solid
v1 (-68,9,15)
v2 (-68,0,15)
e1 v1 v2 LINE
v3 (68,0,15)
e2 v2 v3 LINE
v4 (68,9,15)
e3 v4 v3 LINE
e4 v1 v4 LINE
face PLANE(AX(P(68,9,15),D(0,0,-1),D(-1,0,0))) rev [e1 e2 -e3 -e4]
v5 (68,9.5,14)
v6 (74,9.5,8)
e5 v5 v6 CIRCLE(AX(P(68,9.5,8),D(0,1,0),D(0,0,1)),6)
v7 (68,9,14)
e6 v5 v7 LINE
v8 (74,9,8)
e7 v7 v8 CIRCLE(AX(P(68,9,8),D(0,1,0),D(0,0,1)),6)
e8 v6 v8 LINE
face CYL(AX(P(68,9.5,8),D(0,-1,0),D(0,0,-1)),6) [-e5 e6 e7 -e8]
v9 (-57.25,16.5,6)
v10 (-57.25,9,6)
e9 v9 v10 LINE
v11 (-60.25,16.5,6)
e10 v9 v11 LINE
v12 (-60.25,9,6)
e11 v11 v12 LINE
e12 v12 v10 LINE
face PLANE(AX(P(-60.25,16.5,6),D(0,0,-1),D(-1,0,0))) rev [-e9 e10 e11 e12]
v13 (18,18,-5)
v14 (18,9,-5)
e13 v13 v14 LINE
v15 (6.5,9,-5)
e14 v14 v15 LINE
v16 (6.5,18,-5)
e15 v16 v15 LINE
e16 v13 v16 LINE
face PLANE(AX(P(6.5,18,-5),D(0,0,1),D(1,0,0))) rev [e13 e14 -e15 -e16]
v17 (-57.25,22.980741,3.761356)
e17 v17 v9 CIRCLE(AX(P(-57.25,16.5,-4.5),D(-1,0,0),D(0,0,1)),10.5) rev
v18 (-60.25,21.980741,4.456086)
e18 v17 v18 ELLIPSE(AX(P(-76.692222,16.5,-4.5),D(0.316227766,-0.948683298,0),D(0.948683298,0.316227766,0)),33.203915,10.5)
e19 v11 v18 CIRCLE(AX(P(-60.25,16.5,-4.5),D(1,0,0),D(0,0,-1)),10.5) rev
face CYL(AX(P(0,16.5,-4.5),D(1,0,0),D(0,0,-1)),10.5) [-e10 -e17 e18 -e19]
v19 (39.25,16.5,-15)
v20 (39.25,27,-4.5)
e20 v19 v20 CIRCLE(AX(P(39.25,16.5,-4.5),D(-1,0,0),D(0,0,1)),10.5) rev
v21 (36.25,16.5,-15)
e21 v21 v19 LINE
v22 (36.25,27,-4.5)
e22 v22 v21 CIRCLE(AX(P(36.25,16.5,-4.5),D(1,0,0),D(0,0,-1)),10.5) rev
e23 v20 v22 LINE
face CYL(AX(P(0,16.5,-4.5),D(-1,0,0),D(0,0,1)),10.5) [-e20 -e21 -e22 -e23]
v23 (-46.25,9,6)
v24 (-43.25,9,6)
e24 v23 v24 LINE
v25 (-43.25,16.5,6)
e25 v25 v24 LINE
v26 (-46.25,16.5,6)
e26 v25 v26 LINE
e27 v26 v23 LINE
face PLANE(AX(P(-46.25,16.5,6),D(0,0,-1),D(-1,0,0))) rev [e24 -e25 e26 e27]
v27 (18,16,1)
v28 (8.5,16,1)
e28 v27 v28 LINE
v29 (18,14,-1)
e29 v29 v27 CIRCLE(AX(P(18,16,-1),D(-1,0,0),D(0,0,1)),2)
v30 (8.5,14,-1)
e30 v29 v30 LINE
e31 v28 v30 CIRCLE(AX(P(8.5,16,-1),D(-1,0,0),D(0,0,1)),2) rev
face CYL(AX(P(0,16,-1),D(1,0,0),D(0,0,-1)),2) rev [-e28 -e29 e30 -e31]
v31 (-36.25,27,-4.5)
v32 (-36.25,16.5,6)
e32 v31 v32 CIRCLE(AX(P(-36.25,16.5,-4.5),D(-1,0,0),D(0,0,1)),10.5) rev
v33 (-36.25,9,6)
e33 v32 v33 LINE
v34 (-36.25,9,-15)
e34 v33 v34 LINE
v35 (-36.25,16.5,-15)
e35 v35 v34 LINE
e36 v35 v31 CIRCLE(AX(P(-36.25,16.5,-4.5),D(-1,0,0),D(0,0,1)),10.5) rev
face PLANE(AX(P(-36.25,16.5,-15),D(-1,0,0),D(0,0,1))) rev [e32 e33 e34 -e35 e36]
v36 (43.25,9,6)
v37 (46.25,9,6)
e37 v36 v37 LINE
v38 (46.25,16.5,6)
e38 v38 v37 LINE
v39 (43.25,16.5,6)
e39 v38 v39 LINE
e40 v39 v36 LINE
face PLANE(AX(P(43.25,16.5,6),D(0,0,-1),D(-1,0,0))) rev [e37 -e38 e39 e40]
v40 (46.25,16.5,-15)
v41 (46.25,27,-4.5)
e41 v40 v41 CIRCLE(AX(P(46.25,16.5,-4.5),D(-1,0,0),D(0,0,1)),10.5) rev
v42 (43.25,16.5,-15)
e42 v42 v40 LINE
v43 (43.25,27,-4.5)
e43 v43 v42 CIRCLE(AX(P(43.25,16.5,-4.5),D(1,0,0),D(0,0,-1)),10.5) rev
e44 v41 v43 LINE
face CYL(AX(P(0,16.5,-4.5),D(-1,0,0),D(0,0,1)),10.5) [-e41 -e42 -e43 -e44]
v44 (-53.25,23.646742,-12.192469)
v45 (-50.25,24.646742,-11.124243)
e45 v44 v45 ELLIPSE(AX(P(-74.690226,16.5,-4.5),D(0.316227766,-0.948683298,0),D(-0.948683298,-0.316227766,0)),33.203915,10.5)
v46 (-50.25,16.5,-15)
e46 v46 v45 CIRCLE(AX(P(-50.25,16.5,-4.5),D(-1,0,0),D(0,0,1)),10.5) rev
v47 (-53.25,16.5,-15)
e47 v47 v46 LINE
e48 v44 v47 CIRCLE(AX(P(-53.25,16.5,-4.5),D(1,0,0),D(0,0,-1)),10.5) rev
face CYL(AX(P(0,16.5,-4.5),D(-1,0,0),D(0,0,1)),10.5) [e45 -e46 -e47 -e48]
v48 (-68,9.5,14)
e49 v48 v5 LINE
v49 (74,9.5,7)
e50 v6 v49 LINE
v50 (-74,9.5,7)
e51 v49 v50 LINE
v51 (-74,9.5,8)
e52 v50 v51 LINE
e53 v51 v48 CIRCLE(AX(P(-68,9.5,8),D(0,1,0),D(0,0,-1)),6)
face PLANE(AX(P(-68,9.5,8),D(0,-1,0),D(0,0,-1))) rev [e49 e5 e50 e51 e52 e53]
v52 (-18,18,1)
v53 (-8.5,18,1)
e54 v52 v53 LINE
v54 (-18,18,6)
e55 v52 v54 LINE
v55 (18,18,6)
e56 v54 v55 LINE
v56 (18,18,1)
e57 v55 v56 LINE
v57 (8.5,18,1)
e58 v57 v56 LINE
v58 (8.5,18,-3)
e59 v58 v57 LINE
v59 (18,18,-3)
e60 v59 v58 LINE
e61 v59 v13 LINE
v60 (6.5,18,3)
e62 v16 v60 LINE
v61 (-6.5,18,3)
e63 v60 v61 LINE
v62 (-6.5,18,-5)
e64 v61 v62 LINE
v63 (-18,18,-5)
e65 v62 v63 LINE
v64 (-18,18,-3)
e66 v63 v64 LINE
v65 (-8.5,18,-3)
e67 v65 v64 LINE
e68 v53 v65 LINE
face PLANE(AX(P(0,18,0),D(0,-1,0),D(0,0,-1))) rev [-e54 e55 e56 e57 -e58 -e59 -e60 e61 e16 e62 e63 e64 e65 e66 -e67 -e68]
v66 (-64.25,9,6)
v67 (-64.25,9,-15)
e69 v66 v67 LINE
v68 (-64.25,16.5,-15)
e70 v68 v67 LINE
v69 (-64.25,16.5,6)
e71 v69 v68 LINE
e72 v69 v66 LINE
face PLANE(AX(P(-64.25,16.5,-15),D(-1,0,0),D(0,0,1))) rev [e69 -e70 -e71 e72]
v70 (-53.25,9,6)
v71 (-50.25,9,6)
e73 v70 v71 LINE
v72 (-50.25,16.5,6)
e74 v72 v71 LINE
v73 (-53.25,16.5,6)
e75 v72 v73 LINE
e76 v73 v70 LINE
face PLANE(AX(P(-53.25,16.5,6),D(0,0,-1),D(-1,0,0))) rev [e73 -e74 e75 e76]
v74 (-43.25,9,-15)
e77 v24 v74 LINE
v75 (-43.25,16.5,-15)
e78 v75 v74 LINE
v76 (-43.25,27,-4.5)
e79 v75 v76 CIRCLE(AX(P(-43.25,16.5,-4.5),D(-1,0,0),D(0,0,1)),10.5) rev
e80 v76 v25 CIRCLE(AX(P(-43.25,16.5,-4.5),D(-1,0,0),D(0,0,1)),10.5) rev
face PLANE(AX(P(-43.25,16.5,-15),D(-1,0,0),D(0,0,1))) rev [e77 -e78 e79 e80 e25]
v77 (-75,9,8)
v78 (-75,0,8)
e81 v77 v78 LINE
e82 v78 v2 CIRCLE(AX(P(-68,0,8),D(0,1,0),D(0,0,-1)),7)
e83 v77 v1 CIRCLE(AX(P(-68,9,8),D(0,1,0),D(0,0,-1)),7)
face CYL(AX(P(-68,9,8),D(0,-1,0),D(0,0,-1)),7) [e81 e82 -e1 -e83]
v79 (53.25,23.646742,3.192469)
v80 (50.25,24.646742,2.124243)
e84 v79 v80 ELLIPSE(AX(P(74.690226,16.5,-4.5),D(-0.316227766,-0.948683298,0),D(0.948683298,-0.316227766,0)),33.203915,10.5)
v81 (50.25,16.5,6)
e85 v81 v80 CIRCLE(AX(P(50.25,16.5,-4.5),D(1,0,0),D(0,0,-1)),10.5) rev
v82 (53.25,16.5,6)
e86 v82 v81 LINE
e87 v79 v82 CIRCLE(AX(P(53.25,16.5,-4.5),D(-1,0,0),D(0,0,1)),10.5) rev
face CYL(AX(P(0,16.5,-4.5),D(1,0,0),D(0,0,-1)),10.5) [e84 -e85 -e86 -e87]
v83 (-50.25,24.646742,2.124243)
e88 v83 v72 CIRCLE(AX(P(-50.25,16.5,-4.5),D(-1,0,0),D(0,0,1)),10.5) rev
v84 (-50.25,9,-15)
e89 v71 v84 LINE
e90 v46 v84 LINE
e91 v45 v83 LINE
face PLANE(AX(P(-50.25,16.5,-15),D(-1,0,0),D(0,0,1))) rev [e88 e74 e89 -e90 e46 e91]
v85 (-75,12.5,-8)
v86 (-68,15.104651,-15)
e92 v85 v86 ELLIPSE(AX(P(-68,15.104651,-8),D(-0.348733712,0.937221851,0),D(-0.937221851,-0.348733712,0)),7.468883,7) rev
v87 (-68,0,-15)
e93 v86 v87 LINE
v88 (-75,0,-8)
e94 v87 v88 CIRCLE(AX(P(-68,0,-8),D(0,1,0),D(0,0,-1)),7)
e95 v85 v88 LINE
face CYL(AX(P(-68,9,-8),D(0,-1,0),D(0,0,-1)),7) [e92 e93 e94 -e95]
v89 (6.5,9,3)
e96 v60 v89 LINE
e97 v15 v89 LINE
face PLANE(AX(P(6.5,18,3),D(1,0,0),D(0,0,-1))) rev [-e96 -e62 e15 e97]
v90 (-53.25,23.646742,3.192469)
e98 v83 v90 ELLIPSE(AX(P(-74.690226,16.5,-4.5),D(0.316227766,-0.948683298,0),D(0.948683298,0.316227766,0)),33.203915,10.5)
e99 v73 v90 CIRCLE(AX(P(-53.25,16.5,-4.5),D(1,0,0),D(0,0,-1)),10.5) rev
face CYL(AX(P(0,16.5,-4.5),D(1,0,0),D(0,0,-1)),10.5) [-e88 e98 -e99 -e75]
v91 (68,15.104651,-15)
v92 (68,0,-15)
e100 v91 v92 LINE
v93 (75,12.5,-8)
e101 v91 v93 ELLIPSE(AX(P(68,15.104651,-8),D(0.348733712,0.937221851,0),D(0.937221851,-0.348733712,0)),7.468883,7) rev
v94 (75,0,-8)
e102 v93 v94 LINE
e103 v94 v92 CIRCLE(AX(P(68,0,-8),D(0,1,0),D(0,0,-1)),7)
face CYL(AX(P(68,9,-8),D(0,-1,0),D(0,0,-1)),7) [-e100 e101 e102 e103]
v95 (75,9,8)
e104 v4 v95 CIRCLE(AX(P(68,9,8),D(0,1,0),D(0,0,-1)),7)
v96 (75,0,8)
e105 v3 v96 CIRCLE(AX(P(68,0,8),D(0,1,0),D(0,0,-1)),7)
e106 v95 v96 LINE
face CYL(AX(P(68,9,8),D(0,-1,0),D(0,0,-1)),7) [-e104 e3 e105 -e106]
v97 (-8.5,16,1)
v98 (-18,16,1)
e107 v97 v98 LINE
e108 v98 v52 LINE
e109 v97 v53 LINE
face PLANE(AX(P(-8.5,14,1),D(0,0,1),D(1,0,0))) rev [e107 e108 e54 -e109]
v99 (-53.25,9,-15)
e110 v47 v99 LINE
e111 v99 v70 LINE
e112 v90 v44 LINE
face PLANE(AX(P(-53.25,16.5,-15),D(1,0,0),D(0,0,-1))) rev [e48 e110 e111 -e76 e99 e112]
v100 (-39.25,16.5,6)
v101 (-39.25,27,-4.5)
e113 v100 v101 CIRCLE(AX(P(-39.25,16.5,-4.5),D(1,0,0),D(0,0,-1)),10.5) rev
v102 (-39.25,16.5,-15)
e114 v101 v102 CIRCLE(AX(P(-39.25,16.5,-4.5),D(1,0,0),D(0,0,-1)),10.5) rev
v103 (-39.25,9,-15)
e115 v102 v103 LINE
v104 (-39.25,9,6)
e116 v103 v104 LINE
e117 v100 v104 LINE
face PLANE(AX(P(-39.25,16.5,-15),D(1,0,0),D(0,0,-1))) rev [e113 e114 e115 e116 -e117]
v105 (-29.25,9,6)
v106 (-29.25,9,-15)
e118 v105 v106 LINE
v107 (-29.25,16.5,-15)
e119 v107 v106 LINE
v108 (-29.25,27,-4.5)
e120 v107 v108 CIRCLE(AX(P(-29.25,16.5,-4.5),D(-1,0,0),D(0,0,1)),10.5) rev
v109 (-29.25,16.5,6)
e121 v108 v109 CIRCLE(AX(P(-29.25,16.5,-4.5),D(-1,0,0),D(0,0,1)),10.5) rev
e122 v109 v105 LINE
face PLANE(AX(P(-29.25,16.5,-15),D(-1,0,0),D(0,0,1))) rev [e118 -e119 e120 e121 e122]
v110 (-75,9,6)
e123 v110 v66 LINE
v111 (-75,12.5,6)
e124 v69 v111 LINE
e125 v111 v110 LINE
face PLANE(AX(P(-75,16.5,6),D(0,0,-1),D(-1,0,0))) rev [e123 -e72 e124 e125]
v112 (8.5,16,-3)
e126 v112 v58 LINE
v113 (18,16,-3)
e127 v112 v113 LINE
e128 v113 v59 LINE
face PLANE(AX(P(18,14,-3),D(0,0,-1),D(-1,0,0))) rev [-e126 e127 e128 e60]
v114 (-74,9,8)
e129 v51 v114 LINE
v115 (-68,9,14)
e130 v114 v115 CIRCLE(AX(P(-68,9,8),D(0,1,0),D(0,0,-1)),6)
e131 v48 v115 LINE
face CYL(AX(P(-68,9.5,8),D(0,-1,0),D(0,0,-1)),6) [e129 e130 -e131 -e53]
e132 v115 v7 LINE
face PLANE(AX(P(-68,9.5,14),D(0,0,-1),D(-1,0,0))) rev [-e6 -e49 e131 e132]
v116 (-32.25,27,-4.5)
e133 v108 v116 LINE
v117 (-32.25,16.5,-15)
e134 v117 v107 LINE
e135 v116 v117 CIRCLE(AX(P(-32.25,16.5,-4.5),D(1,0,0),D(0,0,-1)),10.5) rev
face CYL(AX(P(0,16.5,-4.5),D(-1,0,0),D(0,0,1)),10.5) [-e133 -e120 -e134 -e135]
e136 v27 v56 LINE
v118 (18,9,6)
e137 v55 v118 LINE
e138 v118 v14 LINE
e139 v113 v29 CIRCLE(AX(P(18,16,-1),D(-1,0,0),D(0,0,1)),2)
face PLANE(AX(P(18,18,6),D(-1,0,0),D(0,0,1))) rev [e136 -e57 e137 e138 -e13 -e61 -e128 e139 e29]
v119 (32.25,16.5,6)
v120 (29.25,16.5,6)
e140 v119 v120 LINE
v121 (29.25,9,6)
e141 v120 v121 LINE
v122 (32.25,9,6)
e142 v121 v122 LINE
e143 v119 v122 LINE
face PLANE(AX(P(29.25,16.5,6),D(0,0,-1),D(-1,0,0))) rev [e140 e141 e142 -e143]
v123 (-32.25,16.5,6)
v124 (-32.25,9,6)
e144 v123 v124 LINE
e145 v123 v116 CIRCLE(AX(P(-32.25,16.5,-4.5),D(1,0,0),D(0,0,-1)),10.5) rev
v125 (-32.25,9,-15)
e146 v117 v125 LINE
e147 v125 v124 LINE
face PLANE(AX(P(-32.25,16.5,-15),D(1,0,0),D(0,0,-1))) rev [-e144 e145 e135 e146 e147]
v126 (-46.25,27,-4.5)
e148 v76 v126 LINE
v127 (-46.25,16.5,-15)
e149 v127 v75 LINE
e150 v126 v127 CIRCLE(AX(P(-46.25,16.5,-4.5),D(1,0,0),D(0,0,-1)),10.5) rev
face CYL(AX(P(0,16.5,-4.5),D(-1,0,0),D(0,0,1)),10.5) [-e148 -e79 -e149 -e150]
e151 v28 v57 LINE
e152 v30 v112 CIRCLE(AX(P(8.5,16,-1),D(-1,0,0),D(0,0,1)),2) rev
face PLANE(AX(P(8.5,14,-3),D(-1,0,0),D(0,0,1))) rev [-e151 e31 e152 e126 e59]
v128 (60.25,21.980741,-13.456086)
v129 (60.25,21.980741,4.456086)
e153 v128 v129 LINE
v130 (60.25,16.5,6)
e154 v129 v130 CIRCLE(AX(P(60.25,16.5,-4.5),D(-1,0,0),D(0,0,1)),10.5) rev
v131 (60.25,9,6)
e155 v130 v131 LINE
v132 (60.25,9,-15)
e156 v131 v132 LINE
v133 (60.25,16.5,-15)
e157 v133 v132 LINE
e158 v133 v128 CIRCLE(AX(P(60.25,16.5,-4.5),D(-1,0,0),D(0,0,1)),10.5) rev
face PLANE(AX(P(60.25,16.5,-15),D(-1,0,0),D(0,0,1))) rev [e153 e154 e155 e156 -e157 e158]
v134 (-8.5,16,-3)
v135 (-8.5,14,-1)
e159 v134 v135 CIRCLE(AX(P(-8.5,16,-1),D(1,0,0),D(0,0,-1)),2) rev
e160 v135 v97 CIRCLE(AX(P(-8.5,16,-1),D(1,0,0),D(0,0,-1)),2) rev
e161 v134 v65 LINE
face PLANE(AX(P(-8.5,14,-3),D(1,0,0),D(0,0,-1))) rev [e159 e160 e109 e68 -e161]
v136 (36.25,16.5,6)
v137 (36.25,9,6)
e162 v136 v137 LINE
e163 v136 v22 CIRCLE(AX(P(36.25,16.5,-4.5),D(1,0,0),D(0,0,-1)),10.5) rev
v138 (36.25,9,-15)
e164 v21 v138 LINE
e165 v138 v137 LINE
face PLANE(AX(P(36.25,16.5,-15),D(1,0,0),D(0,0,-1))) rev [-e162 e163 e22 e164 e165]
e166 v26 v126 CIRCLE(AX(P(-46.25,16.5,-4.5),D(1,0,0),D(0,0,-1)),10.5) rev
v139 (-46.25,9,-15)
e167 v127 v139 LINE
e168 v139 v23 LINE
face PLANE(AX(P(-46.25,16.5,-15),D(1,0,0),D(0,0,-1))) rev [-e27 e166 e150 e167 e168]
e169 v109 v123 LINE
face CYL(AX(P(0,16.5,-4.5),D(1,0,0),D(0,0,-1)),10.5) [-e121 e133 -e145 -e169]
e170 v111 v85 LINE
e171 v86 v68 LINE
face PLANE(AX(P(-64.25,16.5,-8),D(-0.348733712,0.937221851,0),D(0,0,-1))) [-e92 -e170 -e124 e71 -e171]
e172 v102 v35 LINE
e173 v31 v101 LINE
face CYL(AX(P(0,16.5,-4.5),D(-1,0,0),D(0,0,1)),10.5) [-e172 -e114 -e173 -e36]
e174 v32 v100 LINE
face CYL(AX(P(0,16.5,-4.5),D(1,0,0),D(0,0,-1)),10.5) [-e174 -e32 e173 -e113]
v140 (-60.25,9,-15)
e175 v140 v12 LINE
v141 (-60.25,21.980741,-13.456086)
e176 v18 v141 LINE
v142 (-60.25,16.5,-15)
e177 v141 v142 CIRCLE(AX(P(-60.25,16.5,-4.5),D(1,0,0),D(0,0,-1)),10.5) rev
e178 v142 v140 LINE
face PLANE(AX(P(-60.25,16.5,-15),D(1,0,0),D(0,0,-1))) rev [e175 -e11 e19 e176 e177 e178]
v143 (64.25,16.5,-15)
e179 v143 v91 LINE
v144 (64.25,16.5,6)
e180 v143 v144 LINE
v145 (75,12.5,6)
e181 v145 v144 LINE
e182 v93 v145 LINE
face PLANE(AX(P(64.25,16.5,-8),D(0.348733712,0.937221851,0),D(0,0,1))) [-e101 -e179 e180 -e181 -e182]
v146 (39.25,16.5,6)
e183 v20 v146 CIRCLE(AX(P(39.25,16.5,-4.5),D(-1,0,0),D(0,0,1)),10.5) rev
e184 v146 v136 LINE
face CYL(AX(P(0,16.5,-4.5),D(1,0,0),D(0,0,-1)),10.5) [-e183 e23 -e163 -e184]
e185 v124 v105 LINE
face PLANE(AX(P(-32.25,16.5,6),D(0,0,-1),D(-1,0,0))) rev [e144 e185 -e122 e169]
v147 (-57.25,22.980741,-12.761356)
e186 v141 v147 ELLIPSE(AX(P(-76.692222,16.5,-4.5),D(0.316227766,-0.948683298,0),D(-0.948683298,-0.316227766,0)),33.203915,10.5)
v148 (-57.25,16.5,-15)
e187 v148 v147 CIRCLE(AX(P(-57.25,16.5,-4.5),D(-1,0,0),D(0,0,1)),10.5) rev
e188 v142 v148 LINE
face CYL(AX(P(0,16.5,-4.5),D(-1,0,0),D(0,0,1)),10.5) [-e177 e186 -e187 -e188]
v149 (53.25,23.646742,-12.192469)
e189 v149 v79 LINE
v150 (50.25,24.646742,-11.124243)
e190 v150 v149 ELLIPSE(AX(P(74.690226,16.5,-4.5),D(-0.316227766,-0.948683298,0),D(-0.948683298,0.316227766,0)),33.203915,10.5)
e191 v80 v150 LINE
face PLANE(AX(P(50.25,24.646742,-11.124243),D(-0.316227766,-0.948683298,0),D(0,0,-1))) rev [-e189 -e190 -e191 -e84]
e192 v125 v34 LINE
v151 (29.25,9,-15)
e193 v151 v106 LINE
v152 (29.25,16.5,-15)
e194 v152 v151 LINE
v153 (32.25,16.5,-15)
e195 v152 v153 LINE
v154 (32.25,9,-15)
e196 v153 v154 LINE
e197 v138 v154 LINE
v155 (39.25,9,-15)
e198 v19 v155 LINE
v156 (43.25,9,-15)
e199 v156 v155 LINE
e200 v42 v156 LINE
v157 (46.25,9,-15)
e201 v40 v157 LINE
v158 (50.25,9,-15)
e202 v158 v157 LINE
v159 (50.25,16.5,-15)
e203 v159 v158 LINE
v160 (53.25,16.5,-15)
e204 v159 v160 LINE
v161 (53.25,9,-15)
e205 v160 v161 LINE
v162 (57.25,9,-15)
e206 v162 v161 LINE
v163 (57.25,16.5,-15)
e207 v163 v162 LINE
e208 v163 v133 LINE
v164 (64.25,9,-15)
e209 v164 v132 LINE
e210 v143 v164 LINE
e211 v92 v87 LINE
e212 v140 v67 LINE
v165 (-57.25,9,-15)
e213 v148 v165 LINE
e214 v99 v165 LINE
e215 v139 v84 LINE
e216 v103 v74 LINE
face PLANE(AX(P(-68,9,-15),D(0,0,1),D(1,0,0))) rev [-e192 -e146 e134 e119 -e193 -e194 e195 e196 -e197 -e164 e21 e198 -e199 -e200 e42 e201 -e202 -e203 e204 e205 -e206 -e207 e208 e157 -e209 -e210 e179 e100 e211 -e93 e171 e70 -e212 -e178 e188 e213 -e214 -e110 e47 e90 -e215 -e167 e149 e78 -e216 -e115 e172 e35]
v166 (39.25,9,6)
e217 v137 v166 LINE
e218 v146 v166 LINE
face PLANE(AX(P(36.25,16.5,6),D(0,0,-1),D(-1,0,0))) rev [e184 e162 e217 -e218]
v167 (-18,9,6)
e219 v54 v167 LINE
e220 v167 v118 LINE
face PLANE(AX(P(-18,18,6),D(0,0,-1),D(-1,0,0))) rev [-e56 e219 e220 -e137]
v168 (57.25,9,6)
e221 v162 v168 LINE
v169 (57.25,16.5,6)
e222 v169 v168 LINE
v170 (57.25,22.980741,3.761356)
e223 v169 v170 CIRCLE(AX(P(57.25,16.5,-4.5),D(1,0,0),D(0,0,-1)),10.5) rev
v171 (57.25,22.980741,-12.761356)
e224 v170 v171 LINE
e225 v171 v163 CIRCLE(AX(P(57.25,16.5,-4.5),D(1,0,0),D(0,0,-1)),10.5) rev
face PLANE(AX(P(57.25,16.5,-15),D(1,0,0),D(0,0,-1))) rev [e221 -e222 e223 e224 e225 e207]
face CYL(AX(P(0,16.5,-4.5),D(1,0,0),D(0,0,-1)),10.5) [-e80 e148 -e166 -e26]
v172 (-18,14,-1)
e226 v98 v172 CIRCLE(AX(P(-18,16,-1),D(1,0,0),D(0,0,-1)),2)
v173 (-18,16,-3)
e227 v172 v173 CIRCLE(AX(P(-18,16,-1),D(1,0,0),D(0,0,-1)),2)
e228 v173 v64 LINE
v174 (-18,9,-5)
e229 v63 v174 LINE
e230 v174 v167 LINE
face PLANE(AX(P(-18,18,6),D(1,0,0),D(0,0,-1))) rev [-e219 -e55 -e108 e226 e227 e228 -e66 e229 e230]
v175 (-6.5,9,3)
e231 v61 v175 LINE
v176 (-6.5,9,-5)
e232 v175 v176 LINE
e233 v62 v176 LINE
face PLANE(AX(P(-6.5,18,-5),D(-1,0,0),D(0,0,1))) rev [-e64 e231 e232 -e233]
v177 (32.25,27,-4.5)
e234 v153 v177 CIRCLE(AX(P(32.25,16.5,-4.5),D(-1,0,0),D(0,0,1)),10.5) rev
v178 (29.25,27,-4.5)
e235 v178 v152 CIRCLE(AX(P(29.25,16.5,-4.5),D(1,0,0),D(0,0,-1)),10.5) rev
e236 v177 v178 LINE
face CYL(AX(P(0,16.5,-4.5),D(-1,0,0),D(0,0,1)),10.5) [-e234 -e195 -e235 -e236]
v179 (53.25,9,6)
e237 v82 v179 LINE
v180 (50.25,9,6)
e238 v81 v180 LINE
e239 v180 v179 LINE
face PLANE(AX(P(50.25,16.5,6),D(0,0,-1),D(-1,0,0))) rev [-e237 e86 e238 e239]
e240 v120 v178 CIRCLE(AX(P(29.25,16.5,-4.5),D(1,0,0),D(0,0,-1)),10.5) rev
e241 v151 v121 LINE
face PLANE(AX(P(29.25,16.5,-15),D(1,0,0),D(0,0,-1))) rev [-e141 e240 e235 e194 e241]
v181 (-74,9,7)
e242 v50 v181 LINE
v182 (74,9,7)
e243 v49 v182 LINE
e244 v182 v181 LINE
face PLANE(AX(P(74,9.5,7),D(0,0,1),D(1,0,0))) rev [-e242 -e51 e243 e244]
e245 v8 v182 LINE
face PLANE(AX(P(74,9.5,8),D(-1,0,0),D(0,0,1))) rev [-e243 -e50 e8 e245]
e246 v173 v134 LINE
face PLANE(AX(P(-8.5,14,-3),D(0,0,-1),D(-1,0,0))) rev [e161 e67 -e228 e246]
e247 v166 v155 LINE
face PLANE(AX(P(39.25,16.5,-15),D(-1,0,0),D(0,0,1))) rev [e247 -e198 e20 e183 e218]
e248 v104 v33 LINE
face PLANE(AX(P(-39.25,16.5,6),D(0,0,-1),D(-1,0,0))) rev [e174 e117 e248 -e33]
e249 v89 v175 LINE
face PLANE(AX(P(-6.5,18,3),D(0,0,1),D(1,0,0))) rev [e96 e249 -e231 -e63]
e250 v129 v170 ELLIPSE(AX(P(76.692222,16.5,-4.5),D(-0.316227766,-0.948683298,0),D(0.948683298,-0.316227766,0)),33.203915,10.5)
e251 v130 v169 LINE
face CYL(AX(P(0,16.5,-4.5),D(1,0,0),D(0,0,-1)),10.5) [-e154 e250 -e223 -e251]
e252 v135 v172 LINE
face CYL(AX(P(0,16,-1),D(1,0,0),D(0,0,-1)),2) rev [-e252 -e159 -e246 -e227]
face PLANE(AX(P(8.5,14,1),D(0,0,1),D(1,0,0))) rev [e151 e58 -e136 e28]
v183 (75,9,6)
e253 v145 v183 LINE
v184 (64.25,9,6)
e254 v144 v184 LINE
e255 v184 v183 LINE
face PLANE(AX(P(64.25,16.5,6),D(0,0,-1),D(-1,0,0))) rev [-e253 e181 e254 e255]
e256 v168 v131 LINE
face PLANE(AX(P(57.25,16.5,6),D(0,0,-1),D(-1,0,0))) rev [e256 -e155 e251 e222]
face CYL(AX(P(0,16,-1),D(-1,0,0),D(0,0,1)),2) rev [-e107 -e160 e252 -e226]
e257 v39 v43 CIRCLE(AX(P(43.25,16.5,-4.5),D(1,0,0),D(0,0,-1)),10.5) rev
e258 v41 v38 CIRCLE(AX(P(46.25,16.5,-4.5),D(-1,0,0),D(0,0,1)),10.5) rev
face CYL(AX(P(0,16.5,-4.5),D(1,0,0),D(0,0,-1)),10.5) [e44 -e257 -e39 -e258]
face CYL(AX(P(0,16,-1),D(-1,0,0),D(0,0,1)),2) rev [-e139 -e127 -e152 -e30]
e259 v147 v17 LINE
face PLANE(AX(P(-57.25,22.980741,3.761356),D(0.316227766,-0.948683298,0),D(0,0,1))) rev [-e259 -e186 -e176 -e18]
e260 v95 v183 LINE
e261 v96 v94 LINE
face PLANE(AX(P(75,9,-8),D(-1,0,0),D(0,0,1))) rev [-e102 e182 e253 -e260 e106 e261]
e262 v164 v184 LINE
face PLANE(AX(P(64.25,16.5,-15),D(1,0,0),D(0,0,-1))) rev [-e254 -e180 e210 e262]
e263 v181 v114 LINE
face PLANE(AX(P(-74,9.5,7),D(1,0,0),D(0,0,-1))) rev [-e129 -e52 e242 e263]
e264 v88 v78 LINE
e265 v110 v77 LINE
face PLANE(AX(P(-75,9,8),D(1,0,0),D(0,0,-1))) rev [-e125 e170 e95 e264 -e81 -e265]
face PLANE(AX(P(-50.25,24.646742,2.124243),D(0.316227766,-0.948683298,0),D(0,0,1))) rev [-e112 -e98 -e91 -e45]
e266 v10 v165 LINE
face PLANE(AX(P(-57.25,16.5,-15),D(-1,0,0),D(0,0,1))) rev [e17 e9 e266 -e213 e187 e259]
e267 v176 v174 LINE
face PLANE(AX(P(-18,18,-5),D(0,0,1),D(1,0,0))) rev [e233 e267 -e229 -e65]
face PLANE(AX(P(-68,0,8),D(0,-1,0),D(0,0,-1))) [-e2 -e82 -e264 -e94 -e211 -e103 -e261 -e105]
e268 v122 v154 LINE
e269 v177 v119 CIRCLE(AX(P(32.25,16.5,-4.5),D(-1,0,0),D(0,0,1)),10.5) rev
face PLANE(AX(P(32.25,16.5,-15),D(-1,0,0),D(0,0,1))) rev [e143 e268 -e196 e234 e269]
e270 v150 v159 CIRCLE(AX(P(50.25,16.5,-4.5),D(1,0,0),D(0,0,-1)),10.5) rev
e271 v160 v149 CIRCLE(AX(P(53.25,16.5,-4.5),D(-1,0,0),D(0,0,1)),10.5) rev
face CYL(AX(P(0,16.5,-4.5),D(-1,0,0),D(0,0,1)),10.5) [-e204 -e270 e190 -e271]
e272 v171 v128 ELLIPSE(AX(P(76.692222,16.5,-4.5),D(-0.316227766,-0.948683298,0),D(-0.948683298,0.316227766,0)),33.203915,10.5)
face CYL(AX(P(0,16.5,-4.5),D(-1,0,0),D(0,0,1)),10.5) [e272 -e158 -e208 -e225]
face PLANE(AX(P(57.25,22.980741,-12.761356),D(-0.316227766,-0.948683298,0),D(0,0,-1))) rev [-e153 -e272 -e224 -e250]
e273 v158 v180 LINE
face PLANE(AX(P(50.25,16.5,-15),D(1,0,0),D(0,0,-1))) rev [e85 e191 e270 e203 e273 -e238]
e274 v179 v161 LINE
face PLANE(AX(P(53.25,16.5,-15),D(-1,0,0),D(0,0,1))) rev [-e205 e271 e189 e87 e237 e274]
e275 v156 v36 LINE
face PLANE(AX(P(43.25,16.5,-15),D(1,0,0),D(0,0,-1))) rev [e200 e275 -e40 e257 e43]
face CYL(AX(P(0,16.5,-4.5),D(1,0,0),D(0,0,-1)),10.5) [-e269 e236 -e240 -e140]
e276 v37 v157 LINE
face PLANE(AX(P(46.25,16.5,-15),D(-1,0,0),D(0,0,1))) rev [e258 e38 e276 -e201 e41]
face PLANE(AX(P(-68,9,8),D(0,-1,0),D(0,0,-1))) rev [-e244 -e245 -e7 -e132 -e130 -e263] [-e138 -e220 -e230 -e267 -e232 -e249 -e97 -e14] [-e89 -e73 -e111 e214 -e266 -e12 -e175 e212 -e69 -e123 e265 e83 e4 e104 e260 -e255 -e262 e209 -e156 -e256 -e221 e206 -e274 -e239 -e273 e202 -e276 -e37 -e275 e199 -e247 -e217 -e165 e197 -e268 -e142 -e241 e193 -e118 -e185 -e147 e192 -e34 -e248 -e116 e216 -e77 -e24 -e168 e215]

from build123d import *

# Parameters (mm, degrees)
BOSS_EXTRUDE1_DEPTH    = 9
BOSS_EXTRUDE2_DEPTH    = 0.5
SKETCH3_W              = 3
SKETCH3_H              = 21
BOSS_EXTRUDE3_DEPTH    = 7.5
CHAMFER1_SIZE          = 10.75
CHAMFER1_SIZE_2        = 4
CHAMFER2_SIZE          = 4
CHAMFER2_SIZE_2        = 10.75
SKETCH4_W              = 3
SKETCH4_H              = 21
BOSS_EXTRUDE4_DEPTH    = 10.5
FILLET1_R              = 10.5
CUT_EXTRUDE1_START     = 22.980740698
CUT_EXTRUDE1_OUTLINE_W = 3
CUT_EXTRUDE1_OUTLINE_H = 19
CUT_EXTRUDE1_DEPTH     = 4.019259302
CHAMFER3_SIZE2         = 3
CHAMFER3_SIZE          = 1
CUT_EXTRUDE2_START     = 24.646741863
CUT_EXTRUDE2_OUTLINE_W = 3
CUT_EXTRUDE2_OUTLINE_H = 17
CUT_EXTRUDE2_DEPTH     = 2.353258137
CHAMFER4_SIZE2         = 3
CHAMFER4_SIZE          = 1
CUT_EXTRUDE3_START     = 22.980740698
CUT_EXTRUDE3_OUTLINE_W = 3
CUT_EXTRUDE3_OUTLINE_H = 19
CUT_EXTRUDE3_DEPTH     = 4.019259302
CUT_EXTRUDE4_START     = 24.646741863
CUT_EXTRUDE4_OUTLINE_W = 3
CUT_EXTRUDE4_OUTLINE_H = 17
CUT_EXTRUDE4_DEPTH     = 2.353258137
CHAMFER5_SIZE2         = 3
CHAMFER5_SIZE          = 1
CHAMFER6_SIZE2         = 3
CHAMFER6_SIZE          = 1
BOSS_EXTRUDE5_DEPTH    = 9
SKETCH10_W             = 9.5
SKETCH10_H             = 4
CUT_EXTRUDE5_DEPTH     = 4
FILLET2_R              = 2
FILLET3_R              = 2


# Read off the part's stored shape, not the designer's step: Cut-Extrude1, Cut-Extrude2, Cut-Extrude3, Cut-Extrude4
# Some blends are built 0.0001 mm under size
with BuildPart() as part:
    # Sketch1 → Boss-Extrude1 (new body)
    with BuildSketch(Plane(origin=(0, 0, 0), x_dir=(1, 0, 0), z_dir=(0, 1, 0))):
        with BuildLine():
            Line((0, 15), (68, 15))
            ThreePointArc((68, 15), (72.949747468, 12.949747468), (75, 8))
            Line((75, 8), (75, -8))
            ThreePointArc((75, -8), (72.949747468, -12.949747468), (68, -15))
            Line((68, -15), (-68, -15))
            ThreePointArc((-68, -15), (-72.949747468, -12.949747468), (-75, -8))
            Line((-75, -8), (-75, 8))
            ThreePointArc((-75, 8), (-72.949747468, 12.949747468), (-68, 15))
            Line((-68, 15), (0, 15))
        make_face()
    extrude(amount=BOSS_EXTRUDE1_DEPTH)

    # Sketch2 → Boss-Extrude2 (add)
    with BuildSketch(Plane(origin=(0, 9, 0), x_dir=(1, 0, 0), z_dir=(0, 1, 0))):
        with BuildLine():
            Line((74, -7), (-74, -7))
            Line((-74, -7), (-74, -8))
            ThreePointArc((-74, -8), (-72.242640687, -12.242640687), (-68, -14))
            Line((-68, -14), (68, -14))
            ThreePointArc((68, -14), (72.242640687, -12.242640687), (74, -8))
            Line((74, -8), (74, -7))
        make_face()
    extrude(amount=BOSS_EXTRUDE2_DEPTH)

    # Sketch3 → Boss-Extrude3 (add)
    with BuildSketch(Plane(origin=(0, 9, 0), x_dir=(1, 0, 0), z_dir=(0, 1, 0))):
        with BuildLine():
            Line((64.25, -6), (75, -6))
            Line((75, -6), (75, 8))
            ThreePointArc((75, 8), (72.949747468, 12.949747468), (68, 15))
            Line((68, 15), (64.25, 15))
            Line((64.25, 15), (64.25, -6))
        make_face()
        with BuildLine():
            Line((-75, -6), (-64.25, -6))
            Line((-64.25, -6), (-64.25, 15))
            Line((-64.25, 15), (-68, 15))
            ThreePointArc((-68, 15), (-72.949747468, 12.949747468), (-75, 8))
            Line((-75, 8), (-75, -6))
        make_face()
        with Locations((-58.75, 4.5)):
            Rectangle(SKETCH3_W, SKETCH3_H)
        with Locations((-51.75, 4.5)):
            Rectangle(SKETCH3_W, SKETCH3_H)
        with Locations((-44.75, 4.5)):
            Rectangle(SKETCH3_W, SKETCH3_H)
        with Locations((-37.75, 4.5)):
            Rectangle(SKETCH3_W, SKETCH3_H)
        with Locations((-30.75, 4.5)):
            Rectangle(SKETCH3_W, SKETCH3_H)
        with Locations((30.75, 4.5)):
            Rectangle(SKETCH3_W, SKETCH3_H)
        with Locations((37.75, 4.5)):
            Rectangle(SKETCH3_W, SKETCH3_H)
        with Locations((44.75, 4.5)):
            Rectangle(SKETCH3_W, SKETCH3_H)
        with Locations((51.75, 4.5)):
            Rectangle(SKETCH3_W, SKETCH3_H)
        with Locations((58.75, 4.5)):
            Rectangle(SKETCH3_W, SKETCH3_H)
    extrude(amount=BOSS_EXTRUDE3_DEPTH)

    # Chamfer1
    # the kernel refuses this chamfer: 10.75, 4 mm, written as the material it takes off along each edge
    with BuildSketch(Plane(origin=(-75, 16.5, -35.885033622), x_dir=(0.9999096242158825, 0.013444084217698377, 0), z_dir=(0, 0, 1))) as chamfer1_piece_1:
        Polygon((CHAMFER1_SIZE * 0.999909624216, -CHAMFER1_SIZE * 0.0134440842177), (-CHAMFER1_SIZE_2 * 0.0134440842177, -CHAMFER1_SIZE_2 * 0.999909624216), (0, 0), align=None)
    extrude(amount=69.770067243, mode=Mode.SUBTRACT)

    # Chamfer2
    # the kernel refuses this chamfer: 10.75, 4 mm, written as the material it takes off along each edge
    with BuildSketch(Plane(origin=(75, 16.5, 33.885033622), x_dir=(0.09665608708749646, -0.9953178390991163, 0), z_dir=(0, 0, -1))) as chamfer2_piece_1:
        Polygon((CHAMFER2_SIZE * 0.995317839099, CHAMFER2_SIZE * 0.0966560870875), (-CHAMFER2_SIZE_2 * 0.0966560870875, CHAMFER2_SIZE_2 * 0.995317839099), (0, 0), align=None)
    extrude(amount=69.770067243, mode=Mode.SUBTRACT)

    # Sketch4 → Boss-Extrude4 (add)
    with BuildSketch(Plane(origin=(0, 16.5, 0), x_dir=(1, 0, 0), z_dir=(0, 1, 0))):
        with Locations((-44.75, 4.5)):
            Rectangle(SKETCH4_W, SKETCH4_H)
        with Locations((-37.75, 4.5)):
            Rectangle(SKETCH4_W, SKETCH4_H)
        with Locations((-30.75, 4.5)):
            Rectangle(SKETCH4_W, SKETCH4_H)
        with Locations((30.75, 4.5)):
            Rectangle(SKETCH4_W, SKETCH4_H)
        with Locations((37.75, 4.5)):
            Rectangle(SKETCH4_W, SKETCH4_H)
        with Locations((44.75, 4.5)):
            Rectangle(SKETCH4_W, SKETCH4_H)
        with Locations((51.75, 4.5)):
            Rectangle(SKETCH4_W, SKETCH4_H)
        with Locations((58.75, 4.5)):
            Rectangle(SKETCH4_W, SKETCH4_H)
        with Locations((-51.75, 4.5)):
            Rectangle(SKETCH4_W, SKETCH4_H)
        with Locations((-58.75, 4.5)):
            Rectangle(SKETCH4_W, SKETCH4_H)
    extrude(amount=BOSS_EXTRUDE4_DEPTH)

    # Fillet1
    fillet1_edges = [part.edges().sort_by_distance(p)[0] for p in [
        (30.75, 27, 6),
        (37.75, 27, 6),
        (44.75, 27, 6),
        (51.75, 27, 6),
        (58.75, 27, 6),
        (58.75, 27, -15),
        (51.75, 27, -15),
        (44.75, 27, -15),
        (37.75, 27, -15),
        (30.75, 27, -15),
        (-30.75, 27, 6),
        (-37.75, 27, 6),
        (-44.75, 27, 6),
        (-51.75, 27, 6),
        (-58.75, 27, 6),
        (-30.75, 27, -15),
        (-37.75, 27, -15),
        (-44.75, 27, -15),
        (-51.75, 27, -15),
        (-58.75, 27, -15),
    ]]
    fillet(fillet1_edges, radius=FILLET1_R - 0.0001)  # a hair under: the kernel refuses the full size

    # Cut-Extrude1 outline → Cut-Extrude1 (cut)
    with BuildSketch(Plane(origin=(0, 0, 0), x_dir=(1, 0, 0), z_dir=(0, 1, 0)).offset(CUT_EXTRUDE1_START)):
        with Locations((-58.75, 4.5)):
            Rectangle(CUT_EXTRUDE1_OUTLINE_W, CUT_EXTRUDE1_OUTLINE_H)
    extrude(amount=CUT_EXTRUDE1_DEPTH, mode=Mode.SUBTRACT)

    # Chamfer3
    chamfer3_edges = [part.edges().sort_by_distance(p)[0] for p in [
        (-60.25, 22.980740698, -4.5),
    ]]
    chamfer3_side = [part.faces().sort_by_distance(p)[0] for p in [
        (-60.25, 22.960740698, -4.5),
    ]]
    chamfer(chamfer3_edges, length=CHAMFER3_SIZE - 0.0001, length2=CHAMFER3_SIZE2 - 0.0001, reference=chamfer3_side[0])  # a hair under: the kernel refuses the full size

    # Cut-Extrude2 outline → Cut-Extrude2 (cut)
    with BuildSketch(Plane(origin=(0, 0, 0), x_dir=(1, 0, 0), z_dir=(0, 1, 0)).offset(CUT_EXTRUDE2_START)):
        with Locations((-51.75, 4.5)):
            Rectangle(CUT_EXTRUDE2_OUTLINE_W, CUT_EXTRUDE2_OUTLINE_H)
    extrude(amount=CUT_EXTRUDE2_DEPTH, mode=Mode.SUBTRACT)

    # Chamfer4
    chamfer4_edges = [part.edges().sort_by_distance(p)[0] for p in [
        (-53.25, 24.646741863, -4.5),
    ]]
    chamfer4_side = [part.faces().sort_by_distance(p)[0] for p in [
        (-53.25, 24.626741863, -4.5),
    ]]
    chamfer(chamfer4_edges, length=CHAMFER4_SIZE - 0.0001, length2=CHAMFER4_SIZE2 - 0.0001, reference=chamfer4_side[0])  # a hair under: the kernel refuses the full size

    # Cut-Extrude3 outline → Cut-Extrude3 (cut)
    with BuildSketch(Plane(origin=(0, 0, 0), x_dir=(1, 0, 0), z_dir=(0, 1, 0)).offset(CUT_EXTRUDE3_START)):
        with Locations((58.75, 4.5)):
            Rectangle(CUT_EXTRUDE3_OUTLINE_W, CUT_EXTRUDE3_OUTLINE_H)
    extrude(amount=CUT_EXTRUDE3_DEPTH, mode=Mode.SUBTRACT)

    # Cut-Extrude4 outline → Cut-Extrude4 (cut)
    with BuildSketch(Plane(origin=(0, 0, 0), x_dir=(1, 0, 0), z_dir=(0, 1, 0)).offset(CUT_EXTRUDE4_START)):
        with Locations((51.75, 4.5)):
            Rectangle(CUT_EXTRUDE4_OUTLINE_W, CUT_EXTRUDE4_OUTLINE_H)
    extrude(amount=CUT_EXTRUDE4_DEPTH, mode=Mode.SUBTRACT)

    # Chamfer5
    chamfer5_edges = [part.edges().sort_by_distance(p)[0] for p in [
        (60.25, 22.980740698, -4.5),
    ]]
    chamfer5_side = [part.faces().sort_by_distance(p)[0] for p in [
        (60.25, 22.960740698, -4.5),
    ]]
    chamfer(chamfer5_edges, length=CHAMFER5_SIZE - 0.0001, length2=CHAMFER5_SIZE2 - 0.0001, reference=chamfer5_side[0])  # a hair under: the kernel refuses the full size

    # Chamfer6
    chamfer6_edges = [part.edges().sort_by_distance(p)[0] for p in [
        (53.25, 24.646741863, -4.5),
    ]]
    chamfer6_side = [part.faces().sort_by_distance(p)[0] for p in [
        (53.25, 24.626741863, -4.5),
    ]]
    chamfer(chamfer6_edges, length=CHAMFER6_SIZE - 0.0001, length2=CHAMFER6_SIZE2 - 0.0001, reference=chamfer6_side[0])  # a hair under: the kernel refuses the full size

    # Sketch9 → Boss-Extrude5 (add)
    with BuildSketch(Plane(origin=(0, 9, 0), x_dir=(1, 0, 0), z_dir=(0, 1, 0))):
        Polygon((-18, 5), (-6.5, 5), (-6.5, -3), (6.5, -3), (6.5, 5), (18, 5), (18, -6), (-18, -6), align=None)
    extrude(amount=BOSS_EXTRUDE5_DEPTH)

    # Sketch10 → Cut-Extrude5 (cut)
    with BuildSketch(Plane(origin=(0, 18, 0), x_dir=(1, 0, 0), z_dir=(0, 1, 0))):
        with Locations((13.25, 1)):
            Rectangle(SKETCH10_W, SKETCH10_H)
        with Locations((-13.25, 1)):
            Rectangle(SKETCH10_W, SKETCH10_H)
    extrude(amount=-CUT_EXTRUDE5_DEPTH, mode=Mode.SUBTRACT)

    # Fillet2
    fillet2_edges = [part.edges().sort_by_distance(p)[0] for p in [
        (13.25, 14, -3),
        (-13.25, 14, -3),
    ]]
    fillet(fillet2_edges, radius=FILLET2_R)

    # Fillet3
    fillet3_edges = [part.edges().sort_by_distance(p)[0] for p in [
        (-13.25, 14, 1),
        (13.25, 14, 1),
    ]]
    fillet(fillet3_edges, radius=FILLET3_R - 0.0001)  # a hair under: the kernel refuses the full size


solid = part.part
